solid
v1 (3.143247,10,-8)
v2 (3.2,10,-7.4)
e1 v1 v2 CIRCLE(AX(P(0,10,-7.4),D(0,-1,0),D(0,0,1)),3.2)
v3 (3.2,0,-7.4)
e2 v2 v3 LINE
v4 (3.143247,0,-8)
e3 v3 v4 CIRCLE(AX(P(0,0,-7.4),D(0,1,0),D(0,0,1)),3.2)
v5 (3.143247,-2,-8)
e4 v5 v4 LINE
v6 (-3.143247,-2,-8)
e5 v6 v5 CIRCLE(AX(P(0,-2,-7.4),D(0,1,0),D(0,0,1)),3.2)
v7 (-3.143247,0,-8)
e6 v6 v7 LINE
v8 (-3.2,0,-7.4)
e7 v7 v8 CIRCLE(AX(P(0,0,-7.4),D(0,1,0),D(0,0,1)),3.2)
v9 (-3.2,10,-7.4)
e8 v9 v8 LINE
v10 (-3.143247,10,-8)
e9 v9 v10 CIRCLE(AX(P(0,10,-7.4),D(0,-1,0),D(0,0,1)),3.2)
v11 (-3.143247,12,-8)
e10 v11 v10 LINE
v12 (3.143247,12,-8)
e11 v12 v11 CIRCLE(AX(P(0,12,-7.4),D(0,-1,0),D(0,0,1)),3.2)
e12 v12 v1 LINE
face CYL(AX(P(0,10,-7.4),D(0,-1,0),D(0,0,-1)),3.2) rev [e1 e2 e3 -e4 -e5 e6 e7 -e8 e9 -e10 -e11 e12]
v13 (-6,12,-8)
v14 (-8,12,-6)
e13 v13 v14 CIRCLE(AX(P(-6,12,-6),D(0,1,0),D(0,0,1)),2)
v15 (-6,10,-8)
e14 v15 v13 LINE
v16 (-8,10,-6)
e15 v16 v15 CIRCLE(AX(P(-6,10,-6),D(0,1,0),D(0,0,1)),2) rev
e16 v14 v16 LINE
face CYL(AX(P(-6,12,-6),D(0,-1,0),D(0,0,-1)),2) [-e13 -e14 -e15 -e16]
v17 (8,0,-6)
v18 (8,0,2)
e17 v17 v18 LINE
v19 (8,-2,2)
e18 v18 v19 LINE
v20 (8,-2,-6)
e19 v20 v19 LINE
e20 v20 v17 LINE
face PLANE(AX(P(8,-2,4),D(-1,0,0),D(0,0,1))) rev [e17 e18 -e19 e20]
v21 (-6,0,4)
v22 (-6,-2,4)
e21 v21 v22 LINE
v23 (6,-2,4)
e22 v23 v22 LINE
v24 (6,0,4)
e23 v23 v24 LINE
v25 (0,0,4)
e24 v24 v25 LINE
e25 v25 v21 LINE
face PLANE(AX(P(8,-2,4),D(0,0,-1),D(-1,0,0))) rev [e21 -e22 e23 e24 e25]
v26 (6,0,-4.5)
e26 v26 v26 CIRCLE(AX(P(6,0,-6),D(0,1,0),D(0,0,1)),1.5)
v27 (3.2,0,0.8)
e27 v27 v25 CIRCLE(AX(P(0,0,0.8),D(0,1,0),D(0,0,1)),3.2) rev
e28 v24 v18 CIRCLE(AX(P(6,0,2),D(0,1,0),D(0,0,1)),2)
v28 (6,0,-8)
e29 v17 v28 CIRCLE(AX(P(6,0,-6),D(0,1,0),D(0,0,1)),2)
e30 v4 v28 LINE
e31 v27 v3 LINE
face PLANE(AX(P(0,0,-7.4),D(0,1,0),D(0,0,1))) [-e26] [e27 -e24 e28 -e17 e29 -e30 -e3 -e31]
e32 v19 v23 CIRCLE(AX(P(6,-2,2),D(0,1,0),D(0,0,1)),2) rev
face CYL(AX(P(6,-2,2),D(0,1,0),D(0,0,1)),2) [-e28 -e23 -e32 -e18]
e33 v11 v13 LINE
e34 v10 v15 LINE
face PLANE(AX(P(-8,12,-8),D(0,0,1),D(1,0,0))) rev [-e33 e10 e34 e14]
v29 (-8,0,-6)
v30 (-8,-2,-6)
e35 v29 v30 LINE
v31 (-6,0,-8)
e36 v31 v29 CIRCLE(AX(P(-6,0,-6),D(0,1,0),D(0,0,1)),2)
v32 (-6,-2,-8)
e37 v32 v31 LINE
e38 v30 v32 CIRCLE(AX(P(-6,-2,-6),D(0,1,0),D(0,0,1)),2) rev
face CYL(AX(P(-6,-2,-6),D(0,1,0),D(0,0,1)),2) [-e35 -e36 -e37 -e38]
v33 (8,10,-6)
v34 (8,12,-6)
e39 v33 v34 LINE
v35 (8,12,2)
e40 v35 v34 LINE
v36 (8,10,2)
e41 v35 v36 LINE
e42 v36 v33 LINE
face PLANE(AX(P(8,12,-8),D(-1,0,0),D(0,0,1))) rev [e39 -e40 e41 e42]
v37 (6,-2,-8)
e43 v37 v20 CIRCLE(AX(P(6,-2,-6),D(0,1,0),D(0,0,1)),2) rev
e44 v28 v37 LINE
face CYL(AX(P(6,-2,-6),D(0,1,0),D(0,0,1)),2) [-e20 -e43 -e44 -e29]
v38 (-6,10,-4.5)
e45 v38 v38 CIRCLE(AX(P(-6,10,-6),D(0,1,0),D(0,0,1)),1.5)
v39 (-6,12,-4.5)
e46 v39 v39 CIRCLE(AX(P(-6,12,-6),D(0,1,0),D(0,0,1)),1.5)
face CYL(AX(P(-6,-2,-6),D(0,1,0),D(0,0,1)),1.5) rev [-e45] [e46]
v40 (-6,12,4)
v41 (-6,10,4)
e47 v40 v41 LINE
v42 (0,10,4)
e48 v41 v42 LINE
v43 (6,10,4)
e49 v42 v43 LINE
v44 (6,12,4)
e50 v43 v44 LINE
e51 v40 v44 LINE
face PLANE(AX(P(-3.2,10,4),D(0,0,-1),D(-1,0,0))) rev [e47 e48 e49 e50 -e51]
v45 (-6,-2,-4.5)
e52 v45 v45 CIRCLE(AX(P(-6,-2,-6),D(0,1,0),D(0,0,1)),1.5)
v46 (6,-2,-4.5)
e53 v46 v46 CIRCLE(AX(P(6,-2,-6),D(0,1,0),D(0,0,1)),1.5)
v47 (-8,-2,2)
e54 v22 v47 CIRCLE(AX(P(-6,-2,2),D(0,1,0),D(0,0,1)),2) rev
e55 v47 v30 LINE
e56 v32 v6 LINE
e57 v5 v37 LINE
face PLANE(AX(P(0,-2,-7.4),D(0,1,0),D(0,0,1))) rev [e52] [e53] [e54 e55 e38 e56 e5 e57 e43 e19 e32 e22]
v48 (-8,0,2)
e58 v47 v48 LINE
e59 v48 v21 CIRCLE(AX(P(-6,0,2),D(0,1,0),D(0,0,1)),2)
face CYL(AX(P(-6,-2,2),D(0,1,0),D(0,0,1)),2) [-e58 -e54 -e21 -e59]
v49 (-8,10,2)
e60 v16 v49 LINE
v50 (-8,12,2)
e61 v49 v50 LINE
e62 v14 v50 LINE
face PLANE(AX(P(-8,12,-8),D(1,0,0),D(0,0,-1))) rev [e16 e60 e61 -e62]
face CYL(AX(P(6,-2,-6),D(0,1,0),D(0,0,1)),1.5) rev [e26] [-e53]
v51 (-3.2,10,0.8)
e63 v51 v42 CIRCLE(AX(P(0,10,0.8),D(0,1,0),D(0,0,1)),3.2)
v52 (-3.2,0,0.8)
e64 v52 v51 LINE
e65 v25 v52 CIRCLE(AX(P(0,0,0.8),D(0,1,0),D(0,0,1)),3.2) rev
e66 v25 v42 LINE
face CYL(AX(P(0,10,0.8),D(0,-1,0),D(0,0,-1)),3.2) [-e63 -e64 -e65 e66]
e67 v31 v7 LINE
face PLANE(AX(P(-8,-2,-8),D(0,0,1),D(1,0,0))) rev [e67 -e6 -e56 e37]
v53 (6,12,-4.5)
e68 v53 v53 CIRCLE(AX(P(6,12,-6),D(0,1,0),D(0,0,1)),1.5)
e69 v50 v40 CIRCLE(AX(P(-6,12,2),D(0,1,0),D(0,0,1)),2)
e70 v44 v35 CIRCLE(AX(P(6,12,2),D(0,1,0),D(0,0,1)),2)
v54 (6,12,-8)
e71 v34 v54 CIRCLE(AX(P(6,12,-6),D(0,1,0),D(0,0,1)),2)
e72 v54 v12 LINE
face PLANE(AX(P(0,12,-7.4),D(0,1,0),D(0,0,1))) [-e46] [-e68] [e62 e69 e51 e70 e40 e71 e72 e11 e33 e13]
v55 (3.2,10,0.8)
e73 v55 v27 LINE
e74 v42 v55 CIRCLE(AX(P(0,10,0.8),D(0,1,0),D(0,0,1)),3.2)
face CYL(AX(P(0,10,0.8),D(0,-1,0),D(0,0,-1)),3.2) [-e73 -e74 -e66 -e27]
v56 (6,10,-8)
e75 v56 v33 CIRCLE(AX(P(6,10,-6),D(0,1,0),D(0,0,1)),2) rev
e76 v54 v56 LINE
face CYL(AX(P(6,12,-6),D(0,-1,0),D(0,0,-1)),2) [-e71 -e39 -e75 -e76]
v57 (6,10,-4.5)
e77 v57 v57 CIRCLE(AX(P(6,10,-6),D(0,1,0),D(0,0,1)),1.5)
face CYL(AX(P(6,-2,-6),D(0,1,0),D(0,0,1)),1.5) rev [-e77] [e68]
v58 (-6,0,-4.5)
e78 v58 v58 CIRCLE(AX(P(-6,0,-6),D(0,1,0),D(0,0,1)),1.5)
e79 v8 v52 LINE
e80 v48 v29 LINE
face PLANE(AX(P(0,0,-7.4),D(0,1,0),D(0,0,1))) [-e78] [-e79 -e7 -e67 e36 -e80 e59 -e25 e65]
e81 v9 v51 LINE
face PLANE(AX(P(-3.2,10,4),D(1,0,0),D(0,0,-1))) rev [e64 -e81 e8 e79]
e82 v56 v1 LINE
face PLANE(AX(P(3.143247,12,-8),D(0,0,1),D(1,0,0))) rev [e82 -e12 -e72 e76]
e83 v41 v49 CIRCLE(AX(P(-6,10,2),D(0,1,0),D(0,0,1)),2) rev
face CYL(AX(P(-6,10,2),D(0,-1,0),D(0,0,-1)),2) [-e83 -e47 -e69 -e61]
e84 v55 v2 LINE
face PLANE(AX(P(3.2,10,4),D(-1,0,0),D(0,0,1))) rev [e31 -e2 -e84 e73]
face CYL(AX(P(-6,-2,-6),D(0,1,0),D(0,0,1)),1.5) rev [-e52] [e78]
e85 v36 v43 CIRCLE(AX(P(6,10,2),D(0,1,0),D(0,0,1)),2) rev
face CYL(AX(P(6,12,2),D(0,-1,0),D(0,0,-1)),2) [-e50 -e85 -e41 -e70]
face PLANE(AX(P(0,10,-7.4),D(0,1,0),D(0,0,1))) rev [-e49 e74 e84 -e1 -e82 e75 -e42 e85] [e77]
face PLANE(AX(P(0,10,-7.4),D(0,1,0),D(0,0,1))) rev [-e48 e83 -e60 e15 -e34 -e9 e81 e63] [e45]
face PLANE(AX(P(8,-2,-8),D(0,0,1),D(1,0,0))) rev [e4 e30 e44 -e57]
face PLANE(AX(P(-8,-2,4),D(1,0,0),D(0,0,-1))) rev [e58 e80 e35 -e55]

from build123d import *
from build123d.topology import SkipClean

# Parameters (mm, degrees)
BOSS_EXTRUDE1_DEPTH = 10
BOSS_EXTRUDE2_DEPTH = 2
FILLET1_R           = 3.2
BOSS_EXTRUDE4_START = 2
BOSS_EXTRUDE4_DEPTH = 2
FILLET3_R           = 2
SKETCH5_R           = 1.5
CUT_EXTRUDE1_DEPTH  = 14


with BuildPart() as part:
    # Sketch1 → Boss-Extrude1 (new body)
    with BuildSketch(Plane(origin=(0, 0, 0), x_dir=(1, 0, 0), z_dir=(0, 1, 0))):
        with BuildLine():
            Line((-3.2, 7.4), (-3.2, 4))
            Line((-3.2, 4), (-3.2, -4))
            Line((-3.2, -4), (3.2, -4))
            Line((3.2, -4), (3.2, 4))
            Line((3.2, 4), (3.2, 7.4))
            ThreePointArc((3.2, 7.4), (0, 4.2), (-3.2, 7.4))
        make_face()
    extrude(amount=BOSS_EXTRUDE1_DEPTH)

    # Sketch2 → Boss-Extrude2 (add)
    with SkipClean():  # the faces are left unmerged after this step: merging them gives an invalid solid
        with BuildSketch(Plane(origin=(0, 10, 0), x_dir=(1, 0, 0), z_dir=(0, 1, 0))):
            with BuildLine():
                Line((-8, 8), (-3.143246729, 8))
                ThreePointArc((-3.143246729, 8), (0, 4.2), (3.143246729, 8))
                Line((3.143246729, 8), (8, 8))
                Line((8, 8), (8, -4))
                Line((8, -4), (-8, -4))
                Line((-8, -4), (-8, 8))
            make_face()
        extrude(amount=BOSS_EXTRUDE2_DEPTH)

    # Fillet1
    # the kernel refuses this fillet: 3.2 mm, written as the material it takes off along each edge
    with BuildSketch(Plane(origin=(-3.2, -8, 4), x_dir=(0, 0, -1), z_dir=(0, 1, 0)), Plane(origin=(3.2, -8, 4), x_dir=(-1, 0, 0), z_dir=(0, 1, 0))) as fillet1_piece_1:
        with BuildLine():
            CenterArc((FILLET1_R, -FILLET1_R), FILLET1_R, 90, 90)
            Line((0, -FILLET1_R), (0, 0))
            Line((0, 0), (FILLET1_R, 0))
        make_face()
    extrude(amount=18, mode=Mode.SUBTRACT)

    # Sketch3 → Boss-Extrude4 (add)
    with SkipClean():  # the faces are left unmerged after this step: merging them gives an invalid solid
        with BuildSketch(Plane.XZ.offset(BOSS_EXTRUDE4_START)):
            with BuildLine():
                Line((8, 4), (-8, 4))
                Line((-8, 4), (-8, -8))
                Line((-8, -8), (-3.143246729, -8))
                ThreePointArc((-3.143246729, -8), (0, -4.2), (3.143246729, -8))
                Line((3.143246729, -8), (8, -8))
                Line((8, -8), (8, 4))
            make_face()
        extrude(amount=-BOSS_EXTRUDE4_DEPTH)

    # Fillet3
    fillet3_edges = [part.edges().sort_by_distance(p)[0] for p in [
        (-8, 11, -8),
        (-8, 11, 4),
        (8, 11, 4),
        (8, 11, -8),
        (8, -1, -8),
        (8, -1, 4),
        (-8, -1, 4),
        (-8, -1, -8),
    ]]
    fillet(fillet3_edges, radius=FILLET3_R)

    # Sketch5 → Cut-Extrude1 (cut)
    with SkipClean():  # the faces are left unmerged after this step: merging them gives an invalid solid
        with BuildSketch(Plane(origin=(0, 12, 0), x_dir=(1, 0, 0), z_dir=(0, 1, 0))):
            with Locations(Location((-6, 6, 0), (0, 0, 270))):
                Circle(SKETCH5_R)
            with Locations(Location((6, 6, 0), (0, 0, 270))):
                Circle(SKETCH5_R)
        extrude(amount=-CUT_EXTRUDE1_DEPTH, mode=Mode.SUBTRACT)


solid = part.part
